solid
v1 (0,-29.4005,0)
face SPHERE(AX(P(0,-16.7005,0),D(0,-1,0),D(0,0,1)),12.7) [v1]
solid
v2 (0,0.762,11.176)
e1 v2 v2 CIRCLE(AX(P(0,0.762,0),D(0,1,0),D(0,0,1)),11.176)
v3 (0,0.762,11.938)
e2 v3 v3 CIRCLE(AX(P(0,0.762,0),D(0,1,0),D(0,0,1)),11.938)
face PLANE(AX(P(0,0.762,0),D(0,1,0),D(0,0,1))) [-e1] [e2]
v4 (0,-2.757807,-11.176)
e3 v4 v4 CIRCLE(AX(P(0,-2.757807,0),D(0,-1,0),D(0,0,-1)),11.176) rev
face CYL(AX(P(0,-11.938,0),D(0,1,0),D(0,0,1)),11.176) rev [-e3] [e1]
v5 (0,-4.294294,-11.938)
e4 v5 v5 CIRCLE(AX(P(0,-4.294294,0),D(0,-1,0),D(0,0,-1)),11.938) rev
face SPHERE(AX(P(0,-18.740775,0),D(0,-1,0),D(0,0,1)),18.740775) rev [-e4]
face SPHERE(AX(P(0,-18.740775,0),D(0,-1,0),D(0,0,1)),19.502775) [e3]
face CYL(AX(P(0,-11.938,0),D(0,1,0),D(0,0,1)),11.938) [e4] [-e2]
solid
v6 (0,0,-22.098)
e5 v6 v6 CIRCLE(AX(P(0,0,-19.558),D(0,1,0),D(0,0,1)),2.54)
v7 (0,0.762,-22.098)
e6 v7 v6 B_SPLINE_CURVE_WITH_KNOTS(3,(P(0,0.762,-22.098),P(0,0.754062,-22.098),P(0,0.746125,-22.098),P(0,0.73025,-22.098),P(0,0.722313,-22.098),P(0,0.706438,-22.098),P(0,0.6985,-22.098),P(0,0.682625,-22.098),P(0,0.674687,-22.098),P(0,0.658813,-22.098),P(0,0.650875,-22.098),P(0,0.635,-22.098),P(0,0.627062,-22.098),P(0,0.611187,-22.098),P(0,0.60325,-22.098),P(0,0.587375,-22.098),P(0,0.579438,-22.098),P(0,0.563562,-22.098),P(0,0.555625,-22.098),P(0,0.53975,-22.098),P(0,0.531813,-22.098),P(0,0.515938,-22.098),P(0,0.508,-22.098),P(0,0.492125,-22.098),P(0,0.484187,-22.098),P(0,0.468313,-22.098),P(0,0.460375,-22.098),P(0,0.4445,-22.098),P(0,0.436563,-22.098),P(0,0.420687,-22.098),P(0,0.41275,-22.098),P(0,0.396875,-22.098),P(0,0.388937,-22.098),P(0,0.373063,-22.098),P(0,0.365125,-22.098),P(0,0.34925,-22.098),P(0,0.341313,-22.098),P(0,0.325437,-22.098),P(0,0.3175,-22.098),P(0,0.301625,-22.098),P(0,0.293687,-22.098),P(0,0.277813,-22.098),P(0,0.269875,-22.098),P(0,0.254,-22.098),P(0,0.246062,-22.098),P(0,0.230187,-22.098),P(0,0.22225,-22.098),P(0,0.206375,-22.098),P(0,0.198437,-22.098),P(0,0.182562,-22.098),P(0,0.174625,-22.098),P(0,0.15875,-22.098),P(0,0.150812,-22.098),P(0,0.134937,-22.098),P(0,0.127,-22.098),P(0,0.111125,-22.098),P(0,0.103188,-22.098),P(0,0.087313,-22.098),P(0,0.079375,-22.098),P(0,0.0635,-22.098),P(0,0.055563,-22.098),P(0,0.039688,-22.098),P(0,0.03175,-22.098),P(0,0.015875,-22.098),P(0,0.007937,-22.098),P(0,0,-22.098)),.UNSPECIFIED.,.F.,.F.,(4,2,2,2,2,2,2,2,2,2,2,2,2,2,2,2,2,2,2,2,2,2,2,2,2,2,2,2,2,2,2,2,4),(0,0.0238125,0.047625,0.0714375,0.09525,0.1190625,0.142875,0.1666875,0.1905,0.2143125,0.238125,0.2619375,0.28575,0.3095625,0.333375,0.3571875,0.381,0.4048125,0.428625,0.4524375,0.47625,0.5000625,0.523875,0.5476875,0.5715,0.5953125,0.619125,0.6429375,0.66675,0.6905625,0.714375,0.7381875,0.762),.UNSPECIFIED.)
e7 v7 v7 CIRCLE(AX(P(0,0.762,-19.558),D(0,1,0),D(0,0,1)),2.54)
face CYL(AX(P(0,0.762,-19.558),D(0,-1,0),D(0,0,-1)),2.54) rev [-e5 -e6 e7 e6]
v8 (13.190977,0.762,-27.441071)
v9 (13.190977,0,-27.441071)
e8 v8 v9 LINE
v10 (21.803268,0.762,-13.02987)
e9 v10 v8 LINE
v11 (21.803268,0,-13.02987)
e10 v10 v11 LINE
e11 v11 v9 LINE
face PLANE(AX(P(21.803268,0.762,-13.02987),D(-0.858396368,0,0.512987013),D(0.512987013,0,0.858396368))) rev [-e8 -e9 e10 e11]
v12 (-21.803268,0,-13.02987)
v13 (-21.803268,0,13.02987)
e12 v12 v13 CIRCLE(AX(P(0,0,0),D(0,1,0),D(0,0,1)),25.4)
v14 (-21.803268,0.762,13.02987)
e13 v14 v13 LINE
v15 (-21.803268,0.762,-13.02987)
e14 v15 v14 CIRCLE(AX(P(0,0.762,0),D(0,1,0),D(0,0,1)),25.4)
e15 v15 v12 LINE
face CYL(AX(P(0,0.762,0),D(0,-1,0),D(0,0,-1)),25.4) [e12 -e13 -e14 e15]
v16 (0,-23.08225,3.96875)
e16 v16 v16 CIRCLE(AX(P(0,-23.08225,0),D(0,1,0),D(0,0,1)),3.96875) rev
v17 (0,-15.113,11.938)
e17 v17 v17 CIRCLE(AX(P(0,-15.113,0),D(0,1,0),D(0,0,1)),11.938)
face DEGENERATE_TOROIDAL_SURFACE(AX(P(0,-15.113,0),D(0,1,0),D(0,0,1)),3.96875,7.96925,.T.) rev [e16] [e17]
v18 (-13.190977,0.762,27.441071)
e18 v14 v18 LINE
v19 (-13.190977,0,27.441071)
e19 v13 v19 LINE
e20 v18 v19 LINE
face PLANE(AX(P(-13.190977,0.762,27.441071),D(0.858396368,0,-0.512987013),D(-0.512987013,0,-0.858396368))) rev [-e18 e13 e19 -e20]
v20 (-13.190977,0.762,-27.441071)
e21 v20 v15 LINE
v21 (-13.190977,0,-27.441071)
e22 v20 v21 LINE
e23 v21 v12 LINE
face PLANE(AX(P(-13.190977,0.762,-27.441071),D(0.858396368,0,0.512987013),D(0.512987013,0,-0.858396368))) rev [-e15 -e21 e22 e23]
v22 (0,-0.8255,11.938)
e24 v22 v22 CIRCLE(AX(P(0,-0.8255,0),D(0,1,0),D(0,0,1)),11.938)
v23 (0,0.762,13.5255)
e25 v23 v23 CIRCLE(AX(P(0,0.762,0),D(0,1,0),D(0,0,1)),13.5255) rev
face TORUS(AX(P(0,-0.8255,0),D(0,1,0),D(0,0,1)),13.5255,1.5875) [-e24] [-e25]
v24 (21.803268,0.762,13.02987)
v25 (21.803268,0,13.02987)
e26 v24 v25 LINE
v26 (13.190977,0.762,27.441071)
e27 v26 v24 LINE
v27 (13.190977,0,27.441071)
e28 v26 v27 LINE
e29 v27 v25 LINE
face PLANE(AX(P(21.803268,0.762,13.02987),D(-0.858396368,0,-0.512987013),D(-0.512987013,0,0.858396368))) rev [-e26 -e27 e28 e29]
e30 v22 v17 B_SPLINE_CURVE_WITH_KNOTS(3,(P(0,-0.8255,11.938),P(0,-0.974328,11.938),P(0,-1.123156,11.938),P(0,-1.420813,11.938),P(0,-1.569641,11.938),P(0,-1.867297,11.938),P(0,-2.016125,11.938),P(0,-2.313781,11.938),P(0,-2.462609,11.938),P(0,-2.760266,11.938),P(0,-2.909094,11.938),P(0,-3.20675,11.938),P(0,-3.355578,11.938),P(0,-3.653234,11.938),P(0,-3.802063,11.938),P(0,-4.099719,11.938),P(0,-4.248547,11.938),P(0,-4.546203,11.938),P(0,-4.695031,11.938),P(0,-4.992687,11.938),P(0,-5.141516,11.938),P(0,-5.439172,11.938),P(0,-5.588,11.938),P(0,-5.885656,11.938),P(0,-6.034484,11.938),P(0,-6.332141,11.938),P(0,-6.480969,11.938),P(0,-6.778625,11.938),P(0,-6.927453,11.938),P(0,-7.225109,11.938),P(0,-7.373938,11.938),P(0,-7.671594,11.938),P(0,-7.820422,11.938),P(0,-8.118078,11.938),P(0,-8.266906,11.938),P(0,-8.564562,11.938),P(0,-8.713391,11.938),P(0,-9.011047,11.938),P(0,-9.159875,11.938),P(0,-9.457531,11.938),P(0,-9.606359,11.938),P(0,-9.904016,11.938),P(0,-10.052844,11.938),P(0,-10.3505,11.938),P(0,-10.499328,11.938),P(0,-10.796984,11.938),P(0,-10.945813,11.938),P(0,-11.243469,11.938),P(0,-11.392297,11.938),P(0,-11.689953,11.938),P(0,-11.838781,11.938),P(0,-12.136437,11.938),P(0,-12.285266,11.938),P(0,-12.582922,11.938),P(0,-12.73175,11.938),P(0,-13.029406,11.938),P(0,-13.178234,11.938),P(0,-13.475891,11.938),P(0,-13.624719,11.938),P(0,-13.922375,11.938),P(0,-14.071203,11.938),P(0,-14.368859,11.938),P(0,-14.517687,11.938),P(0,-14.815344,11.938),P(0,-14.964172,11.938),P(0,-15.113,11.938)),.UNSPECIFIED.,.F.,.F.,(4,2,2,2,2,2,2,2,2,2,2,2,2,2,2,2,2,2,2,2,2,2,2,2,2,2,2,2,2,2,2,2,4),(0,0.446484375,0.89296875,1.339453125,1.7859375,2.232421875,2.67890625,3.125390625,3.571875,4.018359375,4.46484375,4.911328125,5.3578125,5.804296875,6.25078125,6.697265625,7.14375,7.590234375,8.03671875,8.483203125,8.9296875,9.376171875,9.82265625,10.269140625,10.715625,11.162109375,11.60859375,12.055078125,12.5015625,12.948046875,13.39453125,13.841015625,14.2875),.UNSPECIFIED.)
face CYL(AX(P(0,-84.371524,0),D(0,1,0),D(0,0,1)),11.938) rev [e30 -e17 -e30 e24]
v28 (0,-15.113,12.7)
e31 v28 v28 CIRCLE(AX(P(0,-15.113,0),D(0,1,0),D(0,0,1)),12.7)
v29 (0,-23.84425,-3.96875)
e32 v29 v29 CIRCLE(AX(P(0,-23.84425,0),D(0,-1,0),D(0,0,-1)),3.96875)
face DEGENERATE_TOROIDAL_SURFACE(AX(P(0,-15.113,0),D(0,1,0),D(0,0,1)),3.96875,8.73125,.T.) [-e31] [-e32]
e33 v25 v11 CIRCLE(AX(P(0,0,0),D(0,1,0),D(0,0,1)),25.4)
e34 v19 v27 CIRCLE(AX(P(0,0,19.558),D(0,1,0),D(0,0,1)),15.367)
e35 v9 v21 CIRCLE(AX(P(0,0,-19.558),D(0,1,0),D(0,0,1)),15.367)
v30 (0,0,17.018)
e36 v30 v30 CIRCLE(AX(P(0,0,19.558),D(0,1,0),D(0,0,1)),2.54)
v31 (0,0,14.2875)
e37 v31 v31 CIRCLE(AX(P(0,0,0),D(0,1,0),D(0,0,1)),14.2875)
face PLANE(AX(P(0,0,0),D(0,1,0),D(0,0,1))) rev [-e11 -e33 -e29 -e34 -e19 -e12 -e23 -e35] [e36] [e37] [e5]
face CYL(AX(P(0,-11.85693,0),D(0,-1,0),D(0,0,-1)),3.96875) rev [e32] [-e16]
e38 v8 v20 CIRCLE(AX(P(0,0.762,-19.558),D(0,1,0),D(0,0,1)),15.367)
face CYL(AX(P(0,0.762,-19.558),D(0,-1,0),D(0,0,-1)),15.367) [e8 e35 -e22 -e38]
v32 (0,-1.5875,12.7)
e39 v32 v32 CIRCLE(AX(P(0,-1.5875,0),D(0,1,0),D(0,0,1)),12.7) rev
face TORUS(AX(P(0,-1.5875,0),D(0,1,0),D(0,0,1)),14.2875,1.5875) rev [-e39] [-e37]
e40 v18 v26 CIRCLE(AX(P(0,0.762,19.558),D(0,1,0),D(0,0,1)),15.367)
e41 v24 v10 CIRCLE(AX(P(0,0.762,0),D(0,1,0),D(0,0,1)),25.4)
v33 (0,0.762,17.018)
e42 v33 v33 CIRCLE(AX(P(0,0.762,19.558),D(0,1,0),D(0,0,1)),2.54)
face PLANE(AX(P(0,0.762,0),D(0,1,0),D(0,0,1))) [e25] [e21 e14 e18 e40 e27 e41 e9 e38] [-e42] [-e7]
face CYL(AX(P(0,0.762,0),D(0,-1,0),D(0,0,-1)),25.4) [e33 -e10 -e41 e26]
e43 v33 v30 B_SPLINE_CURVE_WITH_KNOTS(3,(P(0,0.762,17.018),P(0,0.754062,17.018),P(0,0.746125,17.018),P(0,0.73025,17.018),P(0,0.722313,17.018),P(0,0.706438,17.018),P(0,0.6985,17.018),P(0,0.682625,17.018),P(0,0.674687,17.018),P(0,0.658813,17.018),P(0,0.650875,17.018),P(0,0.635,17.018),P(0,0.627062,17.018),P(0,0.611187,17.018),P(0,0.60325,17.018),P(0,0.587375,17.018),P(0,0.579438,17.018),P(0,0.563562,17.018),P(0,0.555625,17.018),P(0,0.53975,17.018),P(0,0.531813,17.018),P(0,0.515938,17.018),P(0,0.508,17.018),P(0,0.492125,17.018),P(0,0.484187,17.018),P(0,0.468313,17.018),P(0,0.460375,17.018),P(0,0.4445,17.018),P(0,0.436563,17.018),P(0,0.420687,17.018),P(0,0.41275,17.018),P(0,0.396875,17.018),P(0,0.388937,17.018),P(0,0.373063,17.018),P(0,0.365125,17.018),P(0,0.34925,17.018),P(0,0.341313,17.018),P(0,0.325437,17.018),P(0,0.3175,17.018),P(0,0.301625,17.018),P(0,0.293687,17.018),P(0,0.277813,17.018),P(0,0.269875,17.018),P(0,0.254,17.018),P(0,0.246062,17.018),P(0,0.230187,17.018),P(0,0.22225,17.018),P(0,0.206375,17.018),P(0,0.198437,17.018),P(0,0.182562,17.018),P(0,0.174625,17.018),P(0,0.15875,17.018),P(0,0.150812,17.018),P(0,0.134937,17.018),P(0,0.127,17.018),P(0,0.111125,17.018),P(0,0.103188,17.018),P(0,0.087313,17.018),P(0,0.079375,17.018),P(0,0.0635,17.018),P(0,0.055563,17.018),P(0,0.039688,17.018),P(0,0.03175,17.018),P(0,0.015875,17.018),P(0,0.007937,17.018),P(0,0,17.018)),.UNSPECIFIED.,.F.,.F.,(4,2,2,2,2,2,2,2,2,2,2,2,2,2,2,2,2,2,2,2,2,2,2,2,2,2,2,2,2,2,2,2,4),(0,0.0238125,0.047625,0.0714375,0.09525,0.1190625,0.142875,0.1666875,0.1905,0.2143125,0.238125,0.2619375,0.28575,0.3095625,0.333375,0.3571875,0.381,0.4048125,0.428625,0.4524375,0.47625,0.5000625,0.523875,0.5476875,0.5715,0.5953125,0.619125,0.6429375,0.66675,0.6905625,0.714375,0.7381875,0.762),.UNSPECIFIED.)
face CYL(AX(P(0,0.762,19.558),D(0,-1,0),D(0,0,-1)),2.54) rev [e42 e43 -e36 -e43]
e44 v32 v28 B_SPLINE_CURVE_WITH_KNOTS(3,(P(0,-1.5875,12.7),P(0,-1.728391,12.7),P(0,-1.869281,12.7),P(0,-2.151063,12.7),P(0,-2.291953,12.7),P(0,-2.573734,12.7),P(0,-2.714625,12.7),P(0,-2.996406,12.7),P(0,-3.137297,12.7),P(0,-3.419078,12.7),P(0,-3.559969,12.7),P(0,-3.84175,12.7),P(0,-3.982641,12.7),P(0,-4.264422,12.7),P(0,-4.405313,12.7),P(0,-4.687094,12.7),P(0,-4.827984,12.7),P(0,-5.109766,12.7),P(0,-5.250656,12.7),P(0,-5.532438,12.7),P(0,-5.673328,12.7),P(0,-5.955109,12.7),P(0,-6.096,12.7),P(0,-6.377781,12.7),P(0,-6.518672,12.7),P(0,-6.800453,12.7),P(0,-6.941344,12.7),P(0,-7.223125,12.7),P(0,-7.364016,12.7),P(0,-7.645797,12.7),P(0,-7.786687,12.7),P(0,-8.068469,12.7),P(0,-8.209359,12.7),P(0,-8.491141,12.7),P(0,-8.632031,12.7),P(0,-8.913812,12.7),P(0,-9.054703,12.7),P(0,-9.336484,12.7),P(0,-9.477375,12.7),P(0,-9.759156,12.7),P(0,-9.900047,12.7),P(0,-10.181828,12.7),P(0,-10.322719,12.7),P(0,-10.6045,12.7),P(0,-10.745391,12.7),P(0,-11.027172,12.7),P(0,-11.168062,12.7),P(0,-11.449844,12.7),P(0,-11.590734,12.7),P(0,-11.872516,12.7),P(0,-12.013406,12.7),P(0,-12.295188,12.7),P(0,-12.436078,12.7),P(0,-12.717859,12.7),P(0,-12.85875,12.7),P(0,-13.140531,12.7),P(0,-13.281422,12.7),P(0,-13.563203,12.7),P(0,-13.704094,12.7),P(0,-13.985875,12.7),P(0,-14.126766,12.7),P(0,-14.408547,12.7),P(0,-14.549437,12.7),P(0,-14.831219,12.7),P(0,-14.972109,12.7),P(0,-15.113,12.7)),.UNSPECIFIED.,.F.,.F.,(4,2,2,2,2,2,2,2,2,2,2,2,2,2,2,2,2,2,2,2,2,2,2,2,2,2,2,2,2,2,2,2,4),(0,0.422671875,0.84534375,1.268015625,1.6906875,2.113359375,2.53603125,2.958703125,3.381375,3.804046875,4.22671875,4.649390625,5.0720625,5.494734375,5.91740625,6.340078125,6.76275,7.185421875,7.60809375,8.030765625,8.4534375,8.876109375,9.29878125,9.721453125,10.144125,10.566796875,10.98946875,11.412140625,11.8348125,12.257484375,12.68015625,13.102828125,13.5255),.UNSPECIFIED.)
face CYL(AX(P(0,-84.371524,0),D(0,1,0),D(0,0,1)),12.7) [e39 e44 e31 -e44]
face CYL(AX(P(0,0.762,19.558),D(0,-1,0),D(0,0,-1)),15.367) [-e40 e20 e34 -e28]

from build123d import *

# Parameters (mm, degrees)
SKETCH1_R           = 2.54
BOSS_EXTRUDE1_DEPTH = 0.762
SKETCH2_R           = 12.7
BOSS_EXTRUDE2_DEPTH = 23.84425
FILLET1_R           = 8.73125
FILLET2_R           = 1.5875
SKETCH6_R           = 3.96875
CUT_EXTRUDE3_DEPTH  = 0.762
SKETCH7_R           = 11.938
BOSS_EXTRUDE3_DEPTH = 12.7
SHELL2_T            = -0.762


# Read off the part's stored shape, not the designer's step: Shell1
with BuildPart() as part:
    # Sketch1 → Boss-Extrude1 (new body)
    with BuildSketch(Plane(origin=(0, 0, 0), x_dir=(1, 0, 0), z_dir=(0, 1, 0))):
        with BuildLine():
            Line((21.803267746, -13.02987013), (13.190976986, -27.441071429))
            ThreePointArc((13.190976986, -27.441071429), (0, -34.925), (-13.190976986, -27.441071429))
            Line((-13.190976986, -27.441071429), (-21.803267746, -13.02987013))
            ThreePointArc((-21.803267746, -13.02987013), (-25.4, 0), (-21.803267746, 13.02987013))
            Line((-21.803267746, 13.02987013), (-13.190976986, 27.441071429))
            ThreePointArc((-13.190976986, 27.441071429), (0, 34.925), (13.190976986, 27.441071429))
            Line((13.190976986, 27.441071429), (21.803267746, 13.02987013))
            ThreePointArc((21.803267746, 13.02987013), (25.4, 0), (21.803267746, -13.02987013))
        make_face()
        with Locations(Location((0, 19.558, 0), (0, 0, 90))):
            Circle(SKETCH1_R, mode=Mode.SUBTRACT)
        with Locations(Location((0, -19.558, 0), (0, 0, 90))):
            Circle(SKETCH1_R, mode=Mode.SUBTRACT)
    extrude(amount=BOSS_EXTRUDE1_DEPTH)

    # Sketch2 → Boss-Extrude2 (add)
    with BuildSketch(Plane.XZ):
        with Locations(Location((0, 0, 0), (0, 0, 90))):
            Circle(SKETCH2_R)
    extrude(amount=BOSS_EXTRUDE2_DEPTH)

    # Fillet1
    fillet1_edges = [part.edges().sort_by_distance(p)[0] for p in [
        (0, -23.84425, -12.7),
    ]]
    fillet(fillet1_edges, radius=FILLET1_R)

    # Shell1 outline → Shell1 (revolve, cut)
    with BuildSketch(Plane.XY):
        with BuildLine():
            ThreePointArc((3.96875, -23.08225), (9.603860716, -20.748110716), (11.938, -15.113))
            Line((11.938, -15.113), (11.938, 0.762))
            Line((11.938, 0.762), (0, 0.762))
            Line((0, 0.762), (0, -23.08225))
            Line((0, -23.08225), (3.96875, -23.08225))
        make_face()
    revolve(axis=Axis((0, 0, 0), (0, 1, 0)), mode=Mode.SUBTRACT)

    # Fillet2
    fillet2_edges = [part.edges().sort_by_distance(p)[0] for p in [
        (0, 0, -12.7),
        (-11.938, 0.762, 0),
    ]]
    fillet(fillet2_edges, radius=FILLET2_R)

    # Sketch6 → Cut-Extrude3 (cut)
    with BuildSketch(Plane.XZ.offset(23.84425)):
        with Locations(Location((0, 0, 0), (0, 0, 90))):
            Circle(SKETCH6_R)
    extrude(amount=-CUT_EXTRUDE3_DEPTH, mode=Mode.SUBTRACT)


with BuildPart() as body_2:
    # Sketch7 → Boss-Extrude3 (new body)
    with BuildSketch(Plane(origin=(0, 0.762, 0), x_dir=(1, 0, 0), z_dir=(0, 1, 0))):
        with Locations(Location((0, 0, 0), (0, 0, 270))):
            Circle(SKETCH7_R)
    extrude(amount=-BOSS_EXTRUDE3_DEPTH)

    # Sketch8 → Cut-Revolve1 (revolve, cut)
    with BuildSketch(Plane(origin=(0, 0, 0), x_dir=(0, 0, -1), z_dir=(1, 0, 0))):
        with BuildLine():
            Line((0, 0), (0, -11.938))
            Line((0, -11.938), (-17.4625, -11.938))
            ThreePointArc((-17.4625, -11.938), (-10.576563126, -3.269738778), (0, 0))
        make_face()
    revolve(axis=Axis((0, -30.908625, 0), (0, 1, 0)), mode=Mode.SUBTRACT)

    # Shell2
    shell2_openings = [body_2.faces().sort_by_distance(p)[0] for p in [
        (0, 0.762, 0),
    ]]
    offset(amount=SHELL2_T, openings=shell2_openings, kind=Kind.INTERSECTION)


with BuildPart() as body_3:
    # Sketch3 → Revolve1 (revolve)
    with BuildSketch(Plane(origin=(0, 0, 0), x_dir=(0, 0, -1), z_dir=(1, 0, 0))):
        with BuildLine():
            Line((0, -29.4005), (0, -4.0005))
            ThreePointArc((0, -4.0005), (-12.7, -16.7005), (0, -29.4005))
        make_face()
    revolve(axis=Axis((0, -84.371524484, 0), (0, 1, 0)))


solid = Compound([part.part, body_2.part, body_3.part])
